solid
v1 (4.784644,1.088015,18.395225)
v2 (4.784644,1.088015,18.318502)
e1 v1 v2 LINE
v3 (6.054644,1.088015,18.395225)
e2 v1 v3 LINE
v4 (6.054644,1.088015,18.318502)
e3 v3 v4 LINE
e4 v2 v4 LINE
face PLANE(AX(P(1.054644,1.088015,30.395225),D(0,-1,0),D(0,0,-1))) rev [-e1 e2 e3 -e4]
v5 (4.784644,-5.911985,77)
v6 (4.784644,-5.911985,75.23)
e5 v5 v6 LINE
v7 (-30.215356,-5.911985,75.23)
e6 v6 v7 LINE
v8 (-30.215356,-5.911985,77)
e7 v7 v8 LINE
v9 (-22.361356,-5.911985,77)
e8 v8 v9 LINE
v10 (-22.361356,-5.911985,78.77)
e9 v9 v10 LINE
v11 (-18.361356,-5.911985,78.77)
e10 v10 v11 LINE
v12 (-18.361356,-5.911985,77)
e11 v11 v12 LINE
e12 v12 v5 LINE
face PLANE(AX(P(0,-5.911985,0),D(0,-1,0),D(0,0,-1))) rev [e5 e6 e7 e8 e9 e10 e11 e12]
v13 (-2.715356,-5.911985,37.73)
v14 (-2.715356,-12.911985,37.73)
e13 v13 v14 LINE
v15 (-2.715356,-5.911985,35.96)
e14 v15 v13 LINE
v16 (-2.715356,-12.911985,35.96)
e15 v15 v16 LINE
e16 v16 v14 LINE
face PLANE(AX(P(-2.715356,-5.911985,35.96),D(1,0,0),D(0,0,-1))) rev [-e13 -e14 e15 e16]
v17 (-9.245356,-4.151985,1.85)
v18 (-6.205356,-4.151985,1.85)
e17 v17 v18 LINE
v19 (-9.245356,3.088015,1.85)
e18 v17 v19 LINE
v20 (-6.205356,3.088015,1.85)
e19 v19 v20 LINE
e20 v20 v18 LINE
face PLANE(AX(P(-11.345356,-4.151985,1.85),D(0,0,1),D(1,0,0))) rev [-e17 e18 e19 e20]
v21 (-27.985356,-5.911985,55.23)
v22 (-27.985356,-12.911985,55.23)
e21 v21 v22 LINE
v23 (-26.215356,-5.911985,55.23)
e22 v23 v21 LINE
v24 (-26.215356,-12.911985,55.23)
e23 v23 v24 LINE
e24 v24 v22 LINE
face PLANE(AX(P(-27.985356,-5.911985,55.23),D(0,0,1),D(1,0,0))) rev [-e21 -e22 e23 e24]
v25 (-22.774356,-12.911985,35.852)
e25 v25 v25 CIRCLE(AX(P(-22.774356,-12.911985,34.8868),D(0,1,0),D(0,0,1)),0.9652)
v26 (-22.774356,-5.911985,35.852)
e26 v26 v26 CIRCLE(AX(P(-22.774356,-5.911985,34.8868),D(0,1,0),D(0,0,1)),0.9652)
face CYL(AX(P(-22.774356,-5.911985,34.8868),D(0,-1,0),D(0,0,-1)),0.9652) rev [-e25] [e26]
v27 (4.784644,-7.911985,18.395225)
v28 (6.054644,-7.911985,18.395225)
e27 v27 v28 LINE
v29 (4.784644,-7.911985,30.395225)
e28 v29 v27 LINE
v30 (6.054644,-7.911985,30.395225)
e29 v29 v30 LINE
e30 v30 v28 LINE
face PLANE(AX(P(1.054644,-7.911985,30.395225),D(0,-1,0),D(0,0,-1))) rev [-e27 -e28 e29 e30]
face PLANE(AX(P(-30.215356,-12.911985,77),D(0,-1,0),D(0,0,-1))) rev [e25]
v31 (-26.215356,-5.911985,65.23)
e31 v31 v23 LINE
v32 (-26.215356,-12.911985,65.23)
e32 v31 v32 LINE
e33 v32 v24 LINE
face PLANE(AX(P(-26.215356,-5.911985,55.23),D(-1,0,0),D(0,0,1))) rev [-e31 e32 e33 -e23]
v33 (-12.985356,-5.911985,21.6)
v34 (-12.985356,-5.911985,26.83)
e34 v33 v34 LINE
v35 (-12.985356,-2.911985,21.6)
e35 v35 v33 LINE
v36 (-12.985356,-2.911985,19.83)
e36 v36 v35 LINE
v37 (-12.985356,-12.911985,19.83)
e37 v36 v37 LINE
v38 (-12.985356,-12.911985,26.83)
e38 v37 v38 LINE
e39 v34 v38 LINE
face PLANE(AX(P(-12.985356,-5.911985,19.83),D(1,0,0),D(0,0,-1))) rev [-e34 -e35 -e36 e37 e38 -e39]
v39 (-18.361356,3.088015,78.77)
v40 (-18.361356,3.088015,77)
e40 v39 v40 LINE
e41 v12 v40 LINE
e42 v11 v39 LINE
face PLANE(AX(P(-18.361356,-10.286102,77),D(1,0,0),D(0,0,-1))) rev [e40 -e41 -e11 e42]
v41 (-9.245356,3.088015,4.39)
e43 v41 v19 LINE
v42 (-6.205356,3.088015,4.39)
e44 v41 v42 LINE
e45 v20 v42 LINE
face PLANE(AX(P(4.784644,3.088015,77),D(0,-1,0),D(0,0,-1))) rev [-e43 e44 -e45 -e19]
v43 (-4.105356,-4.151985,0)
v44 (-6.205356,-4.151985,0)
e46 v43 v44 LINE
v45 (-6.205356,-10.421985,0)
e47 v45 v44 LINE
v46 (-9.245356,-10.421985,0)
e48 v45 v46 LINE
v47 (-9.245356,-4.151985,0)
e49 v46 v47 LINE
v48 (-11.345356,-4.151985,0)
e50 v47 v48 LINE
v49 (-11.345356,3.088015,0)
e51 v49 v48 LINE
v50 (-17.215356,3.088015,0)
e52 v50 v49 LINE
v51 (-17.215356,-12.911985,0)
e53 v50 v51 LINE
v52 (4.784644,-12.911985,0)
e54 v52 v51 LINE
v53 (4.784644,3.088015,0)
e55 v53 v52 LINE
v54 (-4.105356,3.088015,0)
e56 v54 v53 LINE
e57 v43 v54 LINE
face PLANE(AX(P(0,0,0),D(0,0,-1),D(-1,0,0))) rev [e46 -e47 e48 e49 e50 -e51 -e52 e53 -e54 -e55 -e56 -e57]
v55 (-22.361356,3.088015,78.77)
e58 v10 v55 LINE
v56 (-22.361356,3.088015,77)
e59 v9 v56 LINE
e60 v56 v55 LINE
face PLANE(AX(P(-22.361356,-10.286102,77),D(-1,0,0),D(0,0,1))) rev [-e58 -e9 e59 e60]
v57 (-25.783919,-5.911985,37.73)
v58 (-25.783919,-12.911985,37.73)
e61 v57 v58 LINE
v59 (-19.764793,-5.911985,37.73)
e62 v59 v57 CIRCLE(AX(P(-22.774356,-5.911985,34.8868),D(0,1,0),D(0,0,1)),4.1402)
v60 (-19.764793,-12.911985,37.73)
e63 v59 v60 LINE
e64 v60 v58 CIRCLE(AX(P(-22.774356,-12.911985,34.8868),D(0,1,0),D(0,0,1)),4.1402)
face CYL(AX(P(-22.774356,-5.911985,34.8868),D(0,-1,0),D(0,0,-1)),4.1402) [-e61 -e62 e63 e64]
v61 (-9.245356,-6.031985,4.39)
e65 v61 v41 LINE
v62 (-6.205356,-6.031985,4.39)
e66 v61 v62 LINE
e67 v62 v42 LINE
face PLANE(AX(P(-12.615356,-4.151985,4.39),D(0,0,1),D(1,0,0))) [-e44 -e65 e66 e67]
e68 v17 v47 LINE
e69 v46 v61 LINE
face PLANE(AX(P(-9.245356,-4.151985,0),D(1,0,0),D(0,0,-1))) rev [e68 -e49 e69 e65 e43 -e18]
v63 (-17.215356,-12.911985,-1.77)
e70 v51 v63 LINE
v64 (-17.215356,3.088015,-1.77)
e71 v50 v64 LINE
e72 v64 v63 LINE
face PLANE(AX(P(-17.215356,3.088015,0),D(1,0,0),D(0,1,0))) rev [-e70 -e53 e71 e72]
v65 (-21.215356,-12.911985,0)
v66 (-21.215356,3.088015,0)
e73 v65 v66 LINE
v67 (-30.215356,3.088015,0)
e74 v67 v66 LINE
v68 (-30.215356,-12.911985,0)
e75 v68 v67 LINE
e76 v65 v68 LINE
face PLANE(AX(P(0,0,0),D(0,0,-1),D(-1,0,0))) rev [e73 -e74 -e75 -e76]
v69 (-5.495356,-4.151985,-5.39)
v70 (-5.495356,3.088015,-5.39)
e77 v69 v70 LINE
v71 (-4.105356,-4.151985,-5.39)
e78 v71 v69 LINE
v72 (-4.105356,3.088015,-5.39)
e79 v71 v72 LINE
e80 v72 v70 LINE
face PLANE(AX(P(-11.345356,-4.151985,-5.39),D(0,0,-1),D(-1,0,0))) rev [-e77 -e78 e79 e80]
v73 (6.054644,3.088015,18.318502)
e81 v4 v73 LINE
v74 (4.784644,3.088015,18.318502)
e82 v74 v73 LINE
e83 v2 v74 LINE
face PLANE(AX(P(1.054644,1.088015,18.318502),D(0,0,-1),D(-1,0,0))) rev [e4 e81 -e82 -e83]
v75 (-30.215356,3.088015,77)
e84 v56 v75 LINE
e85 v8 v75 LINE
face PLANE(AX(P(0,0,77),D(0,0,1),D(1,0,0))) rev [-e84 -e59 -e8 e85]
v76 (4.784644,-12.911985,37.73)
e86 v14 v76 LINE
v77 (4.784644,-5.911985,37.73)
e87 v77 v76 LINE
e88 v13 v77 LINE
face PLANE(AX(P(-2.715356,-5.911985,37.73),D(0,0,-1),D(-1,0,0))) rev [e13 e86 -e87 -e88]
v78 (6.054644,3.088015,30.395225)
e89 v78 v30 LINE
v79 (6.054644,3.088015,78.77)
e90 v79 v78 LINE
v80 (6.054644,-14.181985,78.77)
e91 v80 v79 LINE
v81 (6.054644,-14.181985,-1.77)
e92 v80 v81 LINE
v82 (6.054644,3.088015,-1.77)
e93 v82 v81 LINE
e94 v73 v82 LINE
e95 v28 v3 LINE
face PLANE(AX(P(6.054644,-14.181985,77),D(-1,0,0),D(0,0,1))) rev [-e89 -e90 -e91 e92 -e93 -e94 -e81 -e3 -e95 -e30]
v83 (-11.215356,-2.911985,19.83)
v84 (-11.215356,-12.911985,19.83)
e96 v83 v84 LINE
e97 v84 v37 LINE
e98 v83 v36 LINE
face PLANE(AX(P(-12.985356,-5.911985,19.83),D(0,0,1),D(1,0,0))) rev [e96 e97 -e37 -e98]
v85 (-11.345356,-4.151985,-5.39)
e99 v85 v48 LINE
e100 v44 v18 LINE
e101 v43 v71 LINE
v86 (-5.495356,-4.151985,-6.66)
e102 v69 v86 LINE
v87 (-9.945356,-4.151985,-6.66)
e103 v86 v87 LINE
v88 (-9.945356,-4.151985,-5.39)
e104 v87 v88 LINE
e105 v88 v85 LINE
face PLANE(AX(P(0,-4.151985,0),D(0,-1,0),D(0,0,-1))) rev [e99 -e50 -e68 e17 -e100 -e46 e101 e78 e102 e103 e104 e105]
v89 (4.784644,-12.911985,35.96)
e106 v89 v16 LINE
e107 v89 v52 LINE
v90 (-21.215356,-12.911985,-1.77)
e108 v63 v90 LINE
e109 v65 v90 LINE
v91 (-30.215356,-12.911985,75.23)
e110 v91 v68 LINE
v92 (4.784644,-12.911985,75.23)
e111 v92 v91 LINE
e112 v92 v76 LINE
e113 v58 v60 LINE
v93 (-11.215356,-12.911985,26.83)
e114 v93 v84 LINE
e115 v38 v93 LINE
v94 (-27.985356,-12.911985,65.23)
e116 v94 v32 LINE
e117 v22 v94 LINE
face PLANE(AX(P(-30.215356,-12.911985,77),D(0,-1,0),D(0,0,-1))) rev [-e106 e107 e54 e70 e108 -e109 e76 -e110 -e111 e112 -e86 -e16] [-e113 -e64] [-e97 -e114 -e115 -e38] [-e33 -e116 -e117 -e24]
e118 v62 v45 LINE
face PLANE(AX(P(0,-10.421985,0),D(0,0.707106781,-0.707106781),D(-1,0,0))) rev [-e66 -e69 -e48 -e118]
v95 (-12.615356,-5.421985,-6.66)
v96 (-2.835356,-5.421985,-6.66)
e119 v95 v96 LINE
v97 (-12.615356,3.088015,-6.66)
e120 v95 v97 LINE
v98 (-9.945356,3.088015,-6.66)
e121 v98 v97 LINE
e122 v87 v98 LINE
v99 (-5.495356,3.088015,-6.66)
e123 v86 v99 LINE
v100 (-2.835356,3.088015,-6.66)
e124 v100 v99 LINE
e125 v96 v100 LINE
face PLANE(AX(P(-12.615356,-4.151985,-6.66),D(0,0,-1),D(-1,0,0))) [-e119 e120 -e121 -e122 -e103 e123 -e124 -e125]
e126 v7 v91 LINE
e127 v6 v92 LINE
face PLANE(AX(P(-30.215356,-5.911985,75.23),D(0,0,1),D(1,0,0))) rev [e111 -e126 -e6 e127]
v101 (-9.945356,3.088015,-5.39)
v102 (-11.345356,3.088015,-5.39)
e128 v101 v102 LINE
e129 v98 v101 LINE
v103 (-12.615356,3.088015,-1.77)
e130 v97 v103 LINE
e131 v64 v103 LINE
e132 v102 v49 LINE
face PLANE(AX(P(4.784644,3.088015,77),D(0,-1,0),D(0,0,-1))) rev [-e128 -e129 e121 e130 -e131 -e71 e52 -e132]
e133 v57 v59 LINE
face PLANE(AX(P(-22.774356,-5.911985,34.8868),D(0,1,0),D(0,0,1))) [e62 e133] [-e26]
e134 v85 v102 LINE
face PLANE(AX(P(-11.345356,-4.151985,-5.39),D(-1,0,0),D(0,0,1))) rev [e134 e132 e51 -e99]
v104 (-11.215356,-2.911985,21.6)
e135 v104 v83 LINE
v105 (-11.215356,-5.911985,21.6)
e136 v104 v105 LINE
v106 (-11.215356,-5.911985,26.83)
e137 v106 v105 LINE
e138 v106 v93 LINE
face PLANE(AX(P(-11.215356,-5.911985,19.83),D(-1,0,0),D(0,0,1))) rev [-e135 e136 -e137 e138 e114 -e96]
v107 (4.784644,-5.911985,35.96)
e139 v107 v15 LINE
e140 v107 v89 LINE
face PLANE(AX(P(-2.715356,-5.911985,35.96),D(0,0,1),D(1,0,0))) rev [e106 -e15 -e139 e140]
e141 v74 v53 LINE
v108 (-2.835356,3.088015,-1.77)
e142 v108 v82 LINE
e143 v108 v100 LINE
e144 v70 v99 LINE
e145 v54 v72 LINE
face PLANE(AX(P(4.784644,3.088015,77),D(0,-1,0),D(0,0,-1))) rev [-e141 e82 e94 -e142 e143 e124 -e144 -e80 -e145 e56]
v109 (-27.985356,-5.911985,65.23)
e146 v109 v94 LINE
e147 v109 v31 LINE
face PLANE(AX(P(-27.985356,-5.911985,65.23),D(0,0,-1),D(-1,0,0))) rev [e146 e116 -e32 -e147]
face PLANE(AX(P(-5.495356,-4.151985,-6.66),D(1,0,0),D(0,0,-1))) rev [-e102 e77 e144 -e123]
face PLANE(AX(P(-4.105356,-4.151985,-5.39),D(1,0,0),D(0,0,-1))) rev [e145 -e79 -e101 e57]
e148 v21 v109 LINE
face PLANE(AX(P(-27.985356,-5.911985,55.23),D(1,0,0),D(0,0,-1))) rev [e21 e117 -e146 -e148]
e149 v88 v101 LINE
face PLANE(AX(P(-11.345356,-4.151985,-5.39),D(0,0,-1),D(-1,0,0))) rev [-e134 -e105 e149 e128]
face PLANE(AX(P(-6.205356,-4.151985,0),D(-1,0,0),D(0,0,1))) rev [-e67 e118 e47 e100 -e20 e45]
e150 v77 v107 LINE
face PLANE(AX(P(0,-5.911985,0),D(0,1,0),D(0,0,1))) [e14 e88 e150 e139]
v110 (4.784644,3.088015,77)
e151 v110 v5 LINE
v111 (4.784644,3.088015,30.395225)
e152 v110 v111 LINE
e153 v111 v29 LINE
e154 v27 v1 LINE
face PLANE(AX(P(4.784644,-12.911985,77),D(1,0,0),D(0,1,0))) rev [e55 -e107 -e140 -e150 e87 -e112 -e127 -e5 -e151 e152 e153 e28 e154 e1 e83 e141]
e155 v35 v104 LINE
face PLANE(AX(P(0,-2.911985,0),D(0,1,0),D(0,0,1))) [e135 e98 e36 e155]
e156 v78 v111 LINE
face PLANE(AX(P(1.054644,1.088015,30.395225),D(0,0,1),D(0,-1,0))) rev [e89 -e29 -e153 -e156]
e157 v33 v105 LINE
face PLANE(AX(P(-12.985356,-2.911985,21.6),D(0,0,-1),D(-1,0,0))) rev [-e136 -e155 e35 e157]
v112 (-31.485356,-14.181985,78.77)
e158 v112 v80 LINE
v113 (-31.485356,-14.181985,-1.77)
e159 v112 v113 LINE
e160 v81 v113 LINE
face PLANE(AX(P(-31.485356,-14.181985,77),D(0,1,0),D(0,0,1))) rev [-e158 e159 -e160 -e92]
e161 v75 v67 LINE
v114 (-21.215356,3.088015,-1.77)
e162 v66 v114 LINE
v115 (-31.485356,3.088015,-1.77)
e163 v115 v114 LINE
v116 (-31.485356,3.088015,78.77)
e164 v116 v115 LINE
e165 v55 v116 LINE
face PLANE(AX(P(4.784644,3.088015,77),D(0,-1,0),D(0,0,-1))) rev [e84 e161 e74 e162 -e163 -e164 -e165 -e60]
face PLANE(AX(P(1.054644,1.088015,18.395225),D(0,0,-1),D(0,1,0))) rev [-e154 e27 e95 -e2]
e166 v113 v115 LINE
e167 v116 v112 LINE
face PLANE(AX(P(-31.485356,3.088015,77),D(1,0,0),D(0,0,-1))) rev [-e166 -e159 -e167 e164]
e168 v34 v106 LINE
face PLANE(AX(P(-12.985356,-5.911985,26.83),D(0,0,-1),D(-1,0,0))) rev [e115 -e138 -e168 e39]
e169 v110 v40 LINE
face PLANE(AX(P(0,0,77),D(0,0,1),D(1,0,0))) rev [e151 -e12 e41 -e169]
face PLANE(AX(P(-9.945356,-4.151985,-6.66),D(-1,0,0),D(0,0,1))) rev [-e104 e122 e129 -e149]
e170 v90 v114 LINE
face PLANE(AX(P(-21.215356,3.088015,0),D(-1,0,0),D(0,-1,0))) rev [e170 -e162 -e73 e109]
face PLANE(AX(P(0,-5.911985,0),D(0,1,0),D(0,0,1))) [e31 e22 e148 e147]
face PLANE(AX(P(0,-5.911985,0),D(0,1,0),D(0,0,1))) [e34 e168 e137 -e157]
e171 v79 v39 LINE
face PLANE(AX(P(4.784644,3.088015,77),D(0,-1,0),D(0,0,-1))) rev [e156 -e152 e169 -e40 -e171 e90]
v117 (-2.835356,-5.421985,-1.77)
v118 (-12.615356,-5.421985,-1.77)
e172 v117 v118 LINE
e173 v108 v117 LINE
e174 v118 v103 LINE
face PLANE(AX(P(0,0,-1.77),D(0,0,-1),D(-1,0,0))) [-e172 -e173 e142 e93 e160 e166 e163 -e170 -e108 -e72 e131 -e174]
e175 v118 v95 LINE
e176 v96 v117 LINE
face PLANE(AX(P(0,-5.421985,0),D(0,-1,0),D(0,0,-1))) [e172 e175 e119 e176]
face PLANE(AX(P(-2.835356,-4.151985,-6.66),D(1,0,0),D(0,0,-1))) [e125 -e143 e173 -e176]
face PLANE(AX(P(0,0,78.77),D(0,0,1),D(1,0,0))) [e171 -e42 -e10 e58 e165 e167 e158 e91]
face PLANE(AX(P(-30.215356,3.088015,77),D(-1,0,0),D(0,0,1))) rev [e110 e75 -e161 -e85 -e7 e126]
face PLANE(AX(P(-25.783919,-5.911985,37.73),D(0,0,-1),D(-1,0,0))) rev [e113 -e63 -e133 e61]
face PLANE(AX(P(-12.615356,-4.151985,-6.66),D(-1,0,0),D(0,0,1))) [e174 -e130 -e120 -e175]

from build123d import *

# Parameters (mm, degrees)
BOSS_EXTRUDE1_DEPTH            = 77
SKETCH3_W                      = 37.54
SKETCH3_H                      = 17.27
BOSS_EXTRUDE2_DEPTH            = 1.77
SKETCH4_W                      = 37.54
SKETCH4_H                      = 17.27
BOSS_EXTRUDE3_DEPTH            = 1.77
SKETCH5_W                      = 4
SKETCH5_H                      = 16
CUT_EXTRUDE2_DEPTH             = 1.77
SKETCH6_W                      = 9.78
SKETCH6_H                      = 11.05
SKETCH6_W_2                    = 7.24
SKETCH6_H_2                    = 7.24
BUTTON_WALLS_DEPTH             = 7.24
SKETCH7_W                      = 9.78
SKETCH7_H                      = 11.05
BUTTON_BOTTOM_DEPTH            = 1.27
SKETCH8_W                      = 7.24
SKETCH8_H                      = 1.77
BUTTON_CUTOUT_MIDDLE_DEPTH     = 7.24
SKETCH9_W                      = 4.45
SKETCH9_H                      = 1.27
SKETCH9_W_2                    = 3.37
SKETCH9_H_2                    = 4.39
BUTTON_CUTOUT_FRONT_BACK_DEPTH = 7.24
SKETCH10_W                     = 3.37
SKETCH10_H                     = 4.39
BUTTON_CUTOUT_BOTTOM_DEPTH     = 1.27
BUTTON_CHAMFER1_SIZE           = 5
SKETCH12_W                     = 35
SKETCH12_H                     = 1.77
SKETCH12_W_2                   = 1.77
SKETCH12_H_2                   = 10
SKETCH12_W_3                   = 7.5
SKETCH12_R                     = 0.9652
SKETCH12_H_3                   = 7
SUPPORT_PCB_BATTERY_DEPTH      = 7
SKETCH13_W                     = 12
SKETCH13_H                     = 9
CUTOUT_USB_DEPTH               = 5
SKETCH14_W                     = 12.076722978
SKETCH14_H                     = 3.837896345
CUTOUT_TEMPORARY_DEPTH         = 5
SKETCH16_W                     = 1.77
SKETCH16_H                     = 1.77
TAB_PCB_RETAINER_DEPTH         = 3
SKETCH17_W                     = 4
SKETCH17_H                     = 1.77
CUTOUT_BACK_MOT_WIRES_DEPTH    = 9


with BuildPart() as part:
    # Sketch2 → Boss-Extrude1 (new body)
    with BuildSketch(Plane.XY):
        Polygon((-30.215355805, 3.088014981), (-30.215355805, -12.911985019), (4.784644195, -12.911985019), (4.784644195, 3.088014981), (6.054644195, 3.088014981), (6.054644195, -14.181985019), (-31.485355805, -14.181985019), (-31.485355805, 3.088014981), align=None)
    extrude(amount=BOSS_EXTRUDE1_DEPTH)

    # Sketch3 → Boss-Extrude2 (add)
    with BuildSketch(Plane.XY.offset(77)):
        with Locations((-12.715355805, -5.546985019)):
            Rectangle(SKETCH3_W, SKETCH3_H)
    extrude(amount=BOSS_EXTRUDE2_DEPTH)

    # Sketch4 → Boss-Extrude3 (add)
    with BuildSketch(Plane(origin=(0, 0, 0), x_dir=(-1, 0, 0), z_dir=(0, 0, -1))):
        with Locations((12.715355805, -5.546985019)):
            Rectangle(SKETCH4_W, SKETCH4_H)
    extrude(amount=BOSS_EXTRUDE3_DEPTH)

    # Sketch5 → Cut-Extrude2 (cut)
    with BuildSketch(Plane(origin=(0, 0, -1.77), x_dir=(-1, 0, 0), z_dir=(0, 0, -1))):
        with Locations((19.215355805, -4.911985019)):
            Rectangle(SKETCH5_W, SKETCH5_H)
    extrude(amount=-CUT_EXTRUDE2_DEPTH, mode=Mode.SUBTRACT)

    # Sketch6 → button_walls (add)
    with BuildSketch(Plane(origin=(0, 3.088014981, 0), x_dir=(1, 0, 0), z_dir=(0, 1, 0))):
        with Locations((-7.725355805, 1.135)):
            Rectangle(SKETCH6_W, SKETCH6_H)
        with Locations((-7.725355805, 1.77)):
            Rectangle(SKETCH6_W_2, SKETCH6_H_2, mode=Mode.SUBTRACT)
    extrude(amount=-BUTTON_WALLS_DEPTH)

    # Sketch7 → button_bottom (add)
    with BuildSketch(Plane.XZ.offset(4.151985019)):
        with Locations((-7.725355805, -1.135)):
            Rectangle(SKETCH7_W, SKETCH7_H)
    extrude(amount=BUTTON_BOTTOM_DEPTH)

    # Sketch8 → button_cutout_middle (cut)
    with BuildSketch(Plane(origin=(0, 3.088014981, 0), x_dir=(1, 0, 0), z_dir=(0, 1, 0))):
        with Locations((-7.725355805, 0.885)):
            Rectangle(SKETCH8_W, SKETCH8_H)
    extrude(amount=-BUTTON_CUTOUT_MIDDLE_DEPTH, mode=Mode.SUBTRACT)

    # Sketch9 → button_cutout_front_back (cut)
    with BuildSketch(Plane(origin=(0, 3.088014981, 0), x_dir=(1, 0, 0), z_dir=(0, 1, 0))):
        with Locations((-7.720355805, 6.025)):
            Rectangle(SKETCH9_W, SKETCH9_H)
        with Locations((-10.930355805, -2.195)):
            Rectangle(SKETCH9_W_2, SKETCH9_H_2)
        with Locations((-4.520355805, -2.195)):
            Rectangle(SKETCH9_W_2, SKETCH9_H_2)
    extrude(amount=-BUTTON_CUTOUT_FRONT_BACK_DEPTH, mode=Mode.SUBTRACT)

    # Sketch10 → button_cutout_bottom (cut)
    with BuildSketch(Plane(origin=(0, -4.151985019, 0), x_dir=(1, 0, 0), z_dir=(0, 1, 0))):
        with Locations((-10.930355805, -2.195)):
            Rectangle(SKETCH10_W, SKETCH10_H)
        with Locations((-4.520355805, -2.195)):
            Rectangle(SKETCH10_W, SKETCH10_H)
    extrude(amount=-BUTTON_CUTOUT_BOTTOM_DEPTH, mode=Mode.SUBTRACT)

    # button_Chamfer1
    # the kernel refuses this chamfer: 5 mm, written as the material it adds along each edge
    with BuildSketch(Plane(origin=(-6.205355805, -5.421985019, 0), x_dir=(0, -0.9996219169112968, -0.027495876610586372), z_dir=(-1, 0, 0))) as button_chamfer1_piece_1_section:
        Polygon((BUTTON_CHAMFER1_SIZE * 0.999621916911, BUTTON_CHAMFER1_SIZE * 0.0274958766106), (-BUTTON_CHAMFER1_SIZE * 0.0274958766106, BUTTON_CHAMFER1_SIZE * 0.999621916911), (0, 0), align=None)
    button_chamfer1_piece_1 = extrude(amount=3.04, mode=Mode.PRIVATE)
    button_chamfer1_piece_1 = split(button_chamfer1_piece_1, bisect_by=Plane(origin=(-7.725355805, -7.110612501, 4.39), z_dir=(0, 0, -1)), keep=Keep.TOP, mode=Mode.PRIVATE)
    add(button_chamfer1_piece_1)

    # Sketch12 → support_pcb_battery (add)
    # profile 1 of 5: a face of its own
    with BuildSketch(Plane(origin=(0, -12.911985019, 0), x_dir=(1, 0, 0), z_dir=(0, 1, 0))):
        with Locations((-12.715355805, -76.115)):
            Rectangle(SKETCH12_W, SKETCH12_H)
    # profile 2 of 5: a face of its own
    with BuildSketch(Plane(origin=(0, -12.911985019, 0), x_dir=(1, 0, 0), z_dir=(0, 1, 0))):
        with Locations((-27.100355805, -60.23)):
            Rectangle(SKETCH12_W_2, SKETCH12_H_2)
    # profile 3 of 5: a face of its own
    with BuildSketch(Plane(origin=(0, -12.911985019, 0), x_dir=(1, 0, 0), z_dir=(0, 1, 0))):
        with Locations((1.034644195, -36.845)):
            Rectangle(SKETCH12_W_3, SKETCH12_H)
    # profile 4 of 5: a face of its own
    with BuildSketch(Plane(origin=(0, -12.911985019, 0), x_dir=(1, 0, 0), z_dir=(0, 1, 0))):
        with BuildLine():
            Line((-25.783918863, -37.73), (-19.764792747, -37.73))
            ThreePointArc((-19.764792747, -37.73), (-22.774355805, -30.7466), (-25.783918863, -37.73))
        make_face()
        with Locations(Location((-22.774355805, -34.8868, 0), (0, 0, 270))):
            Circle(SKETCH12_R, mode=Mode.SUBTRACT)
    # profile 5 of 5: a face of its own
    with BuildSketch(Plane(origin=(0, -12.911985019, 0), x_dir=(1, 0, 0), z_dir=(0, 1, 0))):
        with Locations((-12.100355805, -23.33)):
            Rectangle(SKETCH12_W_2, SKETCH12_H_3)
    extrude(amount=SUPPORT_PCB_BATTERY_DEPTH)

    # Sketch13 → cutout_usb (cut)
    with BuildSketch(Plane(origin=(6.054644195, 0, 0), x_dir=(0, 0, -1), z_dir=(1, 0, 0))):
        with Locations((-24.395224713, -3.411985019)):
            Rectangle(SKETCH13_W, SKETCH13_H)
    extrude(amount=-CUTOUT_USB_DEPTH, mode=Mode.SUBTRACT)

    # Sketch14 → cutout_temporary (cut)
    with BuildSketch(Plane(origin=(6.054644195, 0, 0), x_dir=(0, 0, -1), z_dir=(1, 0, 0))):
        with Locations((-24.356863224, 3.006963154)):
            Rectangle(SKETCH14_W, SKETCH14_H)
    extrude(amount=-CUTOUT_TEMPORARY_DEPTH, mode=Mode.SUBTRACT)

    # Sketch16 → tab_pcb_retainer (add)
    with BuildSketch(Plane(origin=(0, -5.911985019, 0), x_dir=(1, 0, 0), z_dir=(0, 1, 0))):
        with Locations((-12.100355805, -20.715)):
            Rectangle(SKETCH16_W, SKETCH16_H)
    extrude(amount=TAB_PCB_RETAINER_DEPTH)

    # Sketch17 → cutout_back_mot_wires (cut)
    with BuildSketch(Plane(origin=(0, 3.088014981, 0), x_dir=(1, 0, 0), z_dir=(0, 1, 0))):
        with Locations((-20.361355805, -77.885)):
            Rectangle(SKETCH17_W, SKETCH17_H)
    extrude(amount=-CUTOUT_BACK_MOT_WIRES_DEPTH, mode=Mode.SUBTRACT)


solid = part.part
